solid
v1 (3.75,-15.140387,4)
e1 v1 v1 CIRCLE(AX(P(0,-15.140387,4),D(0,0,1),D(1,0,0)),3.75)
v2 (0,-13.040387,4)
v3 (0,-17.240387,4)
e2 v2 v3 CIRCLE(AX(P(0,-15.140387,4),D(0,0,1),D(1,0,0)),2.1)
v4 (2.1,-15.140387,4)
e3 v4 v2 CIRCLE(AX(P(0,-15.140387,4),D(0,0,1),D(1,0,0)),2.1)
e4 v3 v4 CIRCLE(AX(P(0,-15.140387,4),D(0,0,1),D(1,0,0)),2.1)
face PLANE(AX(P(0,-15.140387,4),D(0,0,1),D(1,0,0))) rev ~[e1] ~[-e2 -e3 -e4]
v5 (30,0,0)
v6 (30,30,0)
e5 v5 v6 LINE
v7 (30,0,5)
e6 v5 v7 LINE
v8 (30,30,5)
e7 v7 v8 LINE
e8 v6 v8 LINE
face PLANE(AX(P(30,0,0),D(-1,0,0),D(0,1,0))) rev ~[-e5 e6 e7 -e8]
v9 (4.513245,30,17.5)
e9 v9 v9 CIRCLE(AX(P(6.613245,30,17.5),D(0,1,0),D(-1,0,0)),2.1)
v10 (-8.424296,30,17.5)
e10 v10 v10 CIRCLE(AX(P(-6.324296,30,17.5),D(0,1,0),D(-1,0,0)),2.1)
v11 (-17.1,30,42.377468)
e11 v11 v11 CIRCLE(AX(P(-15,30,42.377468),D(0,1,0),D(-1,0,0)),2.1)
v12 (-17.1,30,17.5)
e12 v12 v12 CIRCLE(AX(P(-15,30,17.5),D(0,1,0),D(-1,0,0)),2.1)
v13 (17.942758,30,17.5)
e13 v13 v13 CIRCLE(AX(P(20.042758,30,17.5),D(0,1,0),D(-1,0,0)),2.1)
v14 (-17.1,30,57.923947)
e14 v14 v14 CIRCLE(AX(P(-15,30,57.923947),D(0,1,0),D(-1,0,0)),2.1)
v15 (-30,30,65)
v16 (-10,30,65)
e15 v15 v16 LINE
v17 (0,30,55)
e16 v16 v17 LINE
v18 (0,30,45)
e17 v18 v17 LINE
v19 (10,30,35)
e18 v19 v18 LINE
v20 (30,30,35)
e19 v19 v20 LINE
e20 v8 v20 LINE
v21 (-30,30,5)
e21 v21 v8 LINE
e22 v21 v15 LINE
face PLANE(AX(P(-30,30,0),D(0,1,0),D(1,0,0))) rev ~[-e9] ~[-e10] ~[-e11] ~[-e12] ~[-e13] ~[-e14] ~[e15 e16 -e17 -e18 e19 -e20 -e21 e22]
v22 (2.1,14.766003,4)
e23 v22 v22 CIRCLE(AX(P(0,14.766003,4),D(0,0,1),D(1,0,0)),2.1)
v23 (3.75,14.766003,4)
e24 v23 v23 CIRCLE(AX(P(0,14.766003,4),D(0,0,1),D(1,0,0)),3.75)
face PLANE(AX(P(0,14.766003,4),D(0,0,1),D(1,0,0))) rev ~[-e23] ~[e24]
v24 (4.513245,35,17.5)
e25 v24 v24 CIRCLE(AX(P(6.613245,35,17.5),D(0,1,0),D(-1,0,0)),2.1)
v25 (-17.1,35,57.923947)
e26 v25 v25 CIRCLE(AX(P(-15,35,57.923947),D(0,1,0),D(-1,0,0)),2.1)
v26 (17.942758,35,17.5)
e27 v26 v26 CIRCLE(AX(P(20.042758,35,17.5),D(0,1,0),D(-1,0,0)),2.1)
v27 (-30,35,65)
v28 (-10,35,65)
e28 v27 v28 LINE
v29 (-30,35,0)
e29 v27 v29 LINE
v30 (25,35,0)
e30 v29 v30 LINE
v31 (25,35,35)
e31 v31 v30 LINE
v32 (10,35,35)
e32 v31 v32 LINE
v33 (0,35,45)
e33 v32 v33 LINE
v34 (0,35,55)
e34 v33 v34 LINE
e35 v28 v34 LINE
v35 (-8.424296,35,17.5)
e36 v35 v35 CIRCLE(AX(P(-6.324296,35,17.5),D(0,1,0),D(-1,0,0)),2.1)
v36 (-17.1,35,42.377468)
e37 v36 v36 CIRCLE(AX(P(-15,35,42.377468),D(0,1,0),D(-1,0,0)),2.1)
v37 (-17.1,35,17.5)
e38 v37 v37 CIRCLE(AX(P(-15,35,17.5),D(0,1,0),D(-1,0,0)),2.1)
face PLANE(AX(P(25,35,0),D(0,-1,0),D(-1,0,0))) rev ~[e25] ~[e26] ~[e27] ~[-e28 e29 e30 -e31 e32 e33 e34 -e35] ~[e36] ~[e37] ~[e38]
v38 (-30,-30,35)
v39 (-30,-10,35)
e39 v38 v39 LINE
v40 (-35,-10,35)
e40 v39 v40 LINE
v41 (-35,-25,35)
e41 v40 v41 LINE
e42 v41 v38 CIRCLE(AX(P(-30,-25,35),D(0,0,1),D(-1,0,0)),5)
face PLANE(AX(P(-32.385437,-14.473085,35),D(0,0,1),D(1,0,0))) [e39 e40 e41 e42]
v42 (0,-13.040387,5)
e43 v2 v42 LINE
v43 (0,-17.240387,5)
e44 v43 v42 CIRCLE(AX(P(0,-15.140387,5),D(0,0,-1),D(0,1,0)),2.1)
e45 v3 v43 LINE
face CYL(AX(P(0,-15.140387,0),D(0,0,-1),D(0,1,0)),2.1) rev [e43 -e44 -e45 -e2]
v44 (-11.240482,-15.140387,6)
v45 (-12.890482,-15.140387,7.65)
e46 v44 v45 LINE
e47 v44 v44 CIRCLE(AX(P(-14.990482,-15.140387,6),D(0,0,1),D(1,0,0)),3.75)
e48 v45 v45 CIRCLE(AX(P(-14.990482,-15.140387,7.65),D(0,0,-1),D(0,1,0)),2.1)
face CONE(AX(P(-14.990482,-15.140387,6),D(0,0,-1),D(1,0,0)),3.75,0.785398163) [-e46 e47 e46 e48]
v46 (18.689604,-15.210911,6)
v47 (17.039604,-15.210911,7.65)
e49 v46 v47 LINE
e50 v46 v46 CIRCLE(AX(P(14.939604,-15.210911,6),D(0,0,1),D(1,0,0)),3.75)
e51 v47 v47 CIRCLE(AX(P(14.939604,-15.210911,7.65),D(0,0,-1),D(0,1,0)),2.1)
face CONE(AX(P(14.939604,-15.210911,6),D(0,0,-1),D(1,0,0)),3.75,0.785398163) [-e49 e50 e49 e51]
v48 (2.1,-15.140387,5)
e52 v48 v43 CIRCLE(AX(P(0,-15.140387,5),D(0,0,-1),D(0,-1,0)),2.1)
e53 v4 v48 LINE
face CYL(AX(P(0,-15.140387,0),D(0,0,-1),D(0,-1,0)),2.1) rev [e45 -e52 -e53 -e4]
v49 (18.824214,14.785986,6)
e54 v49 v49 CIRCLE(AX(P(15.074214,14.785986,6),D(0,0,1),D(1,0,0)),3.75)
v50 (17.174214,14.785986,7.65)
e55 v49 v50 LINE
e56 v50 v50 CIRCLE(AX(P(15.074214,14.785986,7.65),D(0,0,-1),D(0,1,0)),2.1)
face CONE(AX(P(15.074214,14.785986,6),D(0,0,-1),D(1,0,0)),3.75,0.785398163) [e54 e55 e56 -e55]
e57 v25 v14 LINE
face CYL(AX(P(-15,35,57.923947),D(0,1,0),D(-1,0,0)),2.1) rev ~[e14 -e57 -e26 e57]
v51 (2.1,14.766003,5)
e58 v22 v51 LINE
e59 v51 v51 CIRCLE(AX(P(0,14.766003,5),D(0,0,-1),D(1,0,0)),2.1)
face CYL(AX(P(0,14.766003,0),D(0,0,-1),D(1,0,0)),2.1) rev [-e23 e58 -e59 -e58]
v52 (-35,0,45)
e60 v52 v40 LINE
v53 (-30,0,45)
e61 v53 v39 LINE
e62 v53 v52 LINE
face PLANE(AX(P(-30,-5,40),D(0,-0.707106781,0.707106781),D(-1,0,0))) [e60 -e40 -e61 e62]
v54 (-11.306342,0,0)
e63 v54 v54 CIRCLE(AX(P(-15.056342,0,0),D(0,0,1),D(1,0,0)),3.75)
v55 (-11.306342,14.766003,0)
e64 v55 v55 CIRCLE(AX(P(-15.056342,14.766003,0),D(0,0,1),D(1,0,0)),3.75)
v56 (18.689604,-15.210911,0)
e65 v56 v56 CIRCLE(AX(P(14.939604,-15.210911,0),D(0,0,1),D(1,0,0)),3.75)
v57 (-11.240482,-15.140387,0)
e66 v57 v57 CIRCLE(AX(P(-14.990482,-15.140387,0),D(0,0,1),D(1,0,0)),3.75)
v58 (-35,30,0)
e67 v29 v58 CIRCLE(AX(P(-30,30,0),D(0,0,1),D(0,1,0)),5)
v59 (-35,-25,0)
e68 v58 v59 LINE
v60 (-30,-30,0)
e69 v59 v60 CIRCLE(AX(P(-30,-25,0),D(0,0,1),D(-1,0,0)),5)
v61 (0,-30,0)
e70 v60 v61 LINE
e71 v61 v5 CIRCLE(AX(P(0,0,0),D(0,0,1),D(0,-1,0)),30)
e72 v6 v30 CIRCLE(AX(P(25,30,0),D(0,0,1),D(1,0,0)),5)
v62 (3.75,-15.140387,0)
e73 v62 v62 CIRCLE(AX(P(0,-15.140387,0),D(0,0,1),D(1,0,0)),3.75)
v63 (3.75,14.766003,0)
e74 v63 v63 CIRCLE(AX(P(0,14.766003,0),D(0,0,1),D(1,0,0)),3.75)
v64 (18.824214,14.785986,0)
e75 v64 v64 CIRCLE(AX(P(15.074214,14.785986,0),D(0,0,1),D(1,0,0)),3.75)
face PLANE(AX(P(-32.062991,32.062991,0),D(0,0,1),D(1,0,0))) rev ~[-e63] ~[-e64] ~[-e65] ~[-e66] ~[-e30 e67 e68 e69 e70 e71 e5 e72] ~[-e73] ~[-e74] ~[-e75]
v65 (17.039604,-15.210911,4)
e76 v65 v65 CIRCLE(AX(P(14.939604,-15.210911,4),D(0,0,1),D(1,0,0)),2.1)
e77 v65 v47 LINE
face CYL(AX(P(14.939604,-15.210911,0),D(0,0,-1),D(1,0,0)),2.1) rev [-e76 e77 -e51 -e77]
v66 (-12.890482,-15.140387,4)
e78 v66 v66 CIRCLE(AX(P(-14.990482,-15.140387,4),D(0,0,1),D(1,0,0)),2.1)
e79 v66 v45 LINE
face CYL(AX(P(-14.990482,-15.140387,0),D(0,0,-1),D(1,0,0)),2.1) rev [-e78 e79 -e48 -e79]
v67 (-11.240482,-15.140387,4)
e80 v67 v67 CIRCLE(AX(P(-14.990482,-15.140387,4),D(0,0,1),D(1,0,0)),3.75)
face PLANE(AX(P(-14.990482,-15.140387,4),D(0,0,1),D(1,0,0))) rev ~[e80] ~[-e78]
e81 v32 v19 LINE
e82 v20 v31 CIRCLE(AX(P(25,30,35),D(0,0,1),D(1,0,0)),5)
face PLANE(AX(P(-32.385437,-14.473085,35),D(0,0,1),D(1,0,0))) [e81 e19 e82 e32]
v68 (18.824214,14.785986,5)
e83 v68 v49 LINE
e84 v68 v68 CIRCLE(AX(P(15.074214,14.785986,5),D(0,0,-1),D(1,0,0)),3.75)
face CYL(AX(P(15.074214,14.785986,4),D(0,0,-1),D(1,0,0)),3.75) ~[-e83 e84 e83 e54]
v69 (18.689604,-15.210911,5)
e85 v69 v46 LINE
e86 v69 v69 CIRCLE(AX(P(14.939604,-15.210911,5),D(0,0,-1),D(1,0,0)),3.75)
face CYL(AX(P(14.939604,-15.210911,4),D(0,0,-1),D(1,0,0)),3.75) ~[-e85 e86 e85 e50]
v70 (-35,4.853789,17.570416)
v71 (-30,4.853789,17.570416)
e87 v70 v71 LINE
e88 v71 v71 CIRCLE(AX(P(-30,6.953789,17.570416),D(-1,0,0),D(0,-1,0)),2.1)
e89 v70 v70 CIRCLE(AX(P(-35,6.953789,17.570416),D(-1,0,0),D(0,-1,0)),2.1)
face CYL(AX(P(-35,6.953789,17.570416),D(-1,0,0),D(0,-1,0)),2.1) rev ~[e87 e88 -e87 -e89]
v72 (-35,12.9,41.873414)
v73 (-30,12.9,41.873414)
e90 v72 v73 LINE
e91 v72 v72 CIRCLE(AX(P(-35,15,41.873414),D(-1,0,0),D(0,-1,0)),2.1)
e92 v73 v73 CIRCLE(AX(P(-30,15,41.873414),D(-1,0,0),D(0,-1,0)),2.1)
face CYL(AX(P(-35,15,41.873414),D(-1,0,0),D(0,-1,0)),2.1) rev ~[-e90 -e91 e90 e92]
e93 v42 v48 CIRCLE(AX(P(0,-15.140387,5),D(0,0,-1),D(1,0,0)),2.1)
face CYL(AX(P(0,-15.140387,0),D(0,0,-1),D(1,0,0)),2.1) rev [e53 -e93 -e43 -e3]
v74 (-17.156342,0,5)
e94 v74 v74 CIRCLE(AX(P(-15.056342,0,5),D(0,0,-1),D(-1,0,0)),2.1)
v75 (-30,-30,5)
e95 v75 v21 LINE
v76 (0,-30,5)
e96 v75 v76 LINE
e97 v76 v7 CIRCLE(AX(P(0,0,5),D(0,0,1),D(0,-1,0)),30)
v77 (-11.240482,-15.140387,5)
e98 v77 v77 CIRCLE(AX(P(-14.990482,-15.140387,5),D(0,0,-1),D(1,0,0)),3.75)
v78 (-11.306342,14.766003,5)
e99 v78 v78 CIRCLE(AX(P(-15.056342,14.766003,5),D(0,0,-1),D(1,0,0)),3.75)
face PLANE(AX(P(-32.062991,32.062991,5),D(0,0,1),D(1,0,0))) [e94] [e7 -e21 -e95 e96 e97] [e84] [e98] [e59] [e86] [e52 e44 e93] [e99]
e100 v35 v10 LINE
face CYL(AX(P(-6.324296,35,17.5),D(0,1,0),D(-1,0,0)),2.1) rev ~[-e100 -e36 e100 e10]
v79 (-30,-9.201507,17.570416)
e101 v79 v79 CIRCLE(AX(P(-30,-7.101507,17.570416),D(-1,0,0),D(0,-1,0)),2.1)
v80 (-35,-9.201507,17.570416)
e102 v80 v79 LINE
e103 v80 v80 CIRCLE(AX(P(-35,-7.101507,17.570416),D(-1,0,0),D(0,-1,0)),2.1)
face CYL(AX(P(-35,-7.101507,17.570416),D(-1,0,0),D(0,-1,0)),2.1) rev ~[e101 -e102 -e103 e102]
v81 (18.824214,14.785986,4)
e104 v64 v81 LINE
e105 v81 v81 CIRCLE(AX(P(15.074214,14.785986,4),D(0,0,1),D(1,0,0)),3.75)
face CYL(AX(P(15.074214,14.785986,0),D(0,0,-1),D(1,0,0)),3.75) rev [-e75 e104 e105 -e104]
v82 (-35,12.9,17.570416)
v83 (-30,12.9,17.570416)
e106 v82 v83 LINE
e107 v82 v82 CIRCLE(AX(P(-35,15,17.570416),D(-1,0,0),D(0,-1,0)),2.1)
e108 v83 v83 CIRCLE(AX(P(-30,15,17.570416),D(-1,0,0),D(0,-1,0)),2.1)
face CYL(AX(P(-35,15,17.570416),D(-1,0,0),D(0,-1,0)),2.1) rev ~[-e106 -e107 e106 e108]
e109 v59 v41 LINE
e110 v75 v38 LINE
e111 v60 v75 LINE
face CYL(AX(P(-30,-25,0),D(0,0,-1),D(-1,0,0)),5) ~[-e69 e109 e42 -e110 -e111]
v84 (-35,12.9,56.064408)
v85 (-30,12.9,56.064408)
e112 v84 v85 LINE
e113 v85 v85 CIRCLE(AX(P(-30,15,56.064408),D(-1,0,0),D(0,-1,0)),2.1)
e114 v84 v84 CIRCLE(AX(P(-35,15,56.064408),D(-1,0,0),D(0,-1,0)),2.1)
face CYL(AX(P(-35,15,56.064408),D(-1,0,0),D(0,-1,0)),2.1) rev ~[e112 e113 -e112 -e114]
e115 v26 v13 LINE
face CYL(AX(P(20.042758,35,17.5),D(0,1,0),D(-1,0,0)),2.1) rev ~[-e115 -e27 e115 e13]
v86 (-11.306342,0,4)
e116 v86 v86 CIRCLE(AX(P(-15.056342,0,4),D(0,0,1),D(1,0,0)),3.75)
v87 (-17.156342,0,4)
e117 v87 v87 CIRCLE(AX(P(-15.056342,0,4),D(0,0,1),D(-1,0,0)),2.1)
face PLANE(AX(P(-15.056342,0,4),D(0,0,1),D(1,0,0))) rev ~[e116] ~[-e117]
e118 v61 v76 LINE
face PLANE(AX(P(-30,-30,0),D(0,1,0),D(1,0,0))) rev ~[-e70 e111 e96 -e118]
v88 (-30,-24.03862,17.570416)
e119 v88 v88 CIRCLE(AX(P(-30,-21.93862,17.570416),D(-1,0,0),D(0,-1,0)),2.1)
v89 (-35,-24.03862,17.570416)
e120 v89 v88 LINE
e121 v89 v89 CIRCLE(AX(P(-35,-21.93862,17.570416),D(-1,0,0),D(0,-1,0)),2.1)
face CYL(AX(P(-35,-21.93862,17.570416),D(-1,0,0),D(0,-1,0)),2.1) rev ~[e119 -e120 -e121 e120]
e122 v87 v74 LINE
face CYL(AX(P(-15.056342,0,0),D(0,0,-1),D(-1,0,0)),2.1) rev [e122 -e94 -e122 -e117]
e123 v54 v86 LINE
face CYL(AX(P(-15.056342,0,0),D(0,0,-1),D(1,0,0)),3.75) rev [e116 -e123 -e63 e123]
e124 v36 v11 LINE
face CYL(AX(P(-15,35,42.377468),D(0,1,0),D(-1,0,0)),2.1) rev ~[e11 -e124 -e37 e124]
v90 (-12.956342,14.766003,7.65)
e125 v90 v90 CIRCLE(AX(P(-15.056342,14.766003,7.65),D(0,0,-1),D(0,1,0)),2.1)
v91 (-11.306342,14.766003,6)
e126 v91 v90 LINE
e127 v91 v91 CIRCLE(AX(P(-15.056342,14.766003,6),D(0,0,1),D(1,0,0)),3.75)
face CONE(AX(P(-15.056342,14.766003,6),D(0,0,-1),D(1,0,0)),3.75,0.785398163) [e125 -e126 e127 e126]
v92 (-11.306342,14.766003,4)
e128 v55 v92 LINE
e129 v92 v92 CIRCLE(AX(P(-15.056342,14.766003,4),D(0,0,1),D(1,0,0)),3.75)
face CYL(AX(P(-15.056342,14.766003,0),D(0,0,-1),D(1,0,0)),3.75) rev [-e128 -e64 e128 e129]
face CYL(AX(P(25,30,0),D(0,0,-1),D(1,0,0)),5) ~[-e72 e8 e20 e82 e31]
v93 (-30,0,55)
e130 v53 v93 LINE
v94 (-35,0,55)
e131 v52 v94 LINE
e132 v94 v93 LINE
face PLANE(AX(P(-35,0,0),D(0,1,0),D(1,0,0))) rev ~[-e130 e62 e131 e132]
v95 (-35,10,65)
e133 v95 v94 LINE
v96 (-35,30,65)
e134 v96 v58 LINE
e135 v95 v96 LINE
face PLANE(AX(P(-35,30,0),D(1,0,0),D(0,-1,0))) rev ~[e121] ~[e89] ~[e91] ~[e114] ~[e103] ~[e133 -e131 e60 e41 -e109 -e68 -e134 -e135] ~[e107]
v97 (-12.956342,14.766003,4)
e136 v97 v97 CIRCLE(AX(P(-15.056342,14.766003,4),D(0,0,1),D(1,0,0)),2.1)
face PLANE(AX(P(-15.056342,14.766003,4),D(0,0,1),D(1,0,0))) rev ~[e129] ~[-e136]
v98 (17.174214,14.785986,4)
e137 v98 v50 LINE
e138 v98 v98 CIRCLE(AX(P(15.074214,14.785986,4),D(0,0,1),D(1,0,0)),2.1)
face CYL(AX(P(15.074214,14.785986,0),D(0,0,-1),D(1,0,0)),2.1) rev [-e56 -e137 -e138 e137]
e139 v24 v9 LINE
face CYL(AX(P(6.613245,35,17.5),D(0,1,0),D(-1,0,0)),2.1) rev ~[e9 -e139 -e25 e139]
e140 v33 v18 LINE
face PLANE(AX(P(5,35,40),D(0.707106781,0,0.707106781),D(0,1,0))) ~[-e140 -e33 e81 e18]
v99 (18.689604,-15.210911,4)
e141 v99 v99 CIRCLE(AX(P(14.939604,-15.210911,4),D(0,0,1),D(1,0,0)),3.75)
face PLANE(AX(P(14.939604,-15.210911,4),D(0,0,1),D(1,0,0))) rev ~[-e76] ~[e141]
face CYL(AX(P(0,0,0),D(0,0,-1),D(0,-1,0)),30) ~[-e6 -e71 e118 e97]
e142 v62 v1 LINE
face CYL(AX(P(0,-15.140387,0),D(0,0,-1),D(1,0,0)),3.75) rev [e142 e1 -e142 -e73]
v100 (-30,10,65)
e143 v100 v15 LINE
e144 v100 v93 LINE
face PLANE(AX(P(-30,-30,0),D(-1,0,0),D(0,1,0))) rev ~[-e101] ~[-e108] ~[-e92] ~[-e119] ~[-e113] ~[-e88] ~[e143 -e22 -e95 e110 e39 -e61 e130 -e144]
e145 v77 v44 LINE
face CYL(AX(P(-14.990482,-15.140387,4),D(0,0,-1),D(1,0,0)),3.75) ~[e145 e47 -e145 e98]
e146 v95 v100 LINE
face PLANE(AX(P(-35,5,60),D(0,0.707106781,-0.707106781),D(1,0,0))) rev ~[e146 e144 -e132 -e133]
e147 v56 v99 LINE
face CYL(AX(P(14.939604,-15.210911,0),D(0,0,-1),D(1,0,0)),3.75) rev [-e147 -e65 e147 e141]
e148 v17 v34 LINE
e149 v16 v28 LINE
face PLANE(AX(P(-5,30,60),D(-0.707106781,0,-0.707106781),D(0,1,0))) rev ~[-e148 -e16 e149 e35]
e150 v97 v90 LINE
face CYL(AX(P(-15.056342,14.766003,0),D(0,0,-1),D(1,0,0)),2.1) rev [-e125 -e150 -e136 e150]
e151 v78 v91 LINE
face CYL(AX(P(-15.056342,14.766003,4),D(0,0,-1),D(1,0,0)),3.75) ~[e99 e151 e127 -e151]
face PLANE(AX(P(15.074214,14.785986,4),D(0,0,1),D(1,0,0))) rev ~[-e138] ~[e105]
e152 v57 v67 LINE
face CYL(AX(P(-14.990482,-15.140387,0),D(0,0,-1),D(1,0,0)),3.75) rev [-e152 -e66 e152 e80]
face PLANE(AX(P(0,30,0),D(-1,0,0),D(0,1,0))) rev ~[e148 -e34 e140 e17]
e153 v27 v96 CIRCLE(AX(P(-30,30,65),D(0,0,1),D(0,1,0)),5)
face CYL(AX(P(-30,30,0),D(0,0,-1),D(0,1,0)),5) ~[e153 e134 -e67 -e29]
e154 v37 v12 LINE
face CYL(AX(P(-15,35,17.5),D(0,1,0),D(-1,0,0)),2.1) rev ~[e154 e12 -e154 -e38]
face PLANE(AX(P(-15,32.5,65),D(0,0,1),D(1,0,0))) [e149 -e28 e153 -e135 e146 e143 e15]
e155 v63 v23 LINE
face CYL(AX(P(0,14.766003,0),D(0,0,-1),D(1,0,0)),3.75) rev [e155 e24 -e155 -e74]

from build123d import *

# Parameters (mm, degrees)
F0_W      = 30
F0_H      = 30
F0_W_2    = 5
F0_H_2    = 5
F1_DEPTH  = 5
F2_DEPTH  = 35
F3_DEPTH  = 65
F4_R      = 2.1
F6_DEPTH  = 25
F5_R      = 2.1
F7_DEPTH  = 25
F8_R      = 3.75
F8_R_2    = 2.1
F9_DEPTH  = 4
F10_DEPTH = 25
F11_START = 4
F11_DEPTH = 4
F13_SIZE  = 10


# Not quite as in the source:
# - a fillet or chamfer that OpenCascade refuses, or shapes differently, is made with other operations: its cross-section is extruded or revolved along the edge and cut away or added


with BuildPart() as f1:
    # F0 (on Top) → F1 (new body)
    with BuildSketch(Plane.XY):
        with BuildLine():
            Line((-35, 30), (-30, 30))
            Line((-30, 30), (-30, 35))
            ThreePointArc((-30, 35), (-33.5355339059, 33.5355339059), (-35, 30))
        make_face()
        with Locations((15, 15)):
            Rectangle(F0_W, F0_H)
        with BuildLine():
            Line((0, 35), (0, 30))
            Line((0, 30), (30, 30))
            ThreePointArc((30, 30), (28.5355339059, 33.5355339059), (25, 35))
            Line((25, 35), (0, 35))
        make_face()
        with Locations((-15, -15)):
            Rectangle(F0_W, F0_H)
        with Locations((-32.5, 15)):
            Rectangle(F0_W_2, F0_H)
        with BuildLine():
            Line((30, 0), (0, 0))
            Line((0, 0), (0, -30))
            ThreePointArc((0, -30), (21.2132034356, -21.2132034356), (30, 0))
        make_face()
        with Locations((-15, 32.5)):
            Rectangle(F0_W, F0_H_2)
        with BuildLine():
            Line((-30, -30), (-30, 0))
            Line((-30, 0), (-35, 0))
            Line((-35, 0), (-35, -25))
            ThreePointArc((-35, -25), (-33.5355339059, -28.5355339059), (-30, -30))
        make_face()
        with Locations((-15, 15)):
            Rectangle(F0_W, F0_H)
    extrude(amount=F1_DEPTH)

    # F0 (on Top) → F2 (join)
    with BuildSketch(Plane.XY):
        with BuildLine():
            Line((-30, -30), (-30, 0))
            Line((-30, 0), (-35, 0))
            Line((-35, 0), (-35, -25))
            ThreePointArc((-35, -25), (-33.5355339059, -28.5355339059), (-30, -30))
        make_face()
        with Locations((-32.5, 15)):
            Rectangle(F0_W_2, F0_H)
        with BuildLine():
            Line((-35, 30), (-30, 30))
            Line((-30, 30), (-30, 35))
            ThreePointArc((-30, 35), (-33.5355339059, 33.5355339059), (-35, 30))
        make_face()
        with BuildLine():
            Line((0, 35), (0, 30))
            Line((0, 30), (30, 30))
            ThreePointArc((30, 30), (28.5355339059, 33.5355339059), (25, 35))
            Line((25, 35), (0, 35))
        make_face()
        with Locations((-15, 32.5)):
            Rectangle(F0_W, F0_H_2)
    extrude(amount=F2_DEPTH)

    # F0 (on Top) → F3 (join)
    with BuildSketch(Plane.XY):
        with Locations((-15, 32.5)):
            Rectangle(F0_W, F0_H_2)
        with BuildLine():
            Line((-35, 30), (-30, 30))
            Line((-30, 30), (-30, 35))
            ThreePointArc((-30, 35), (-33.5355339059, 33.5355339059), (-35, 30))
        make_face()
        with Locations((-32.5, 15)):
            Rectangle(F0_W_2, F0_H)
    extrude(amount=F3_DEPTH)

    # F4 (on face) → F6 (cut)
    with BuildSketch(Plane(origin=(0, 35, 0), x_dir=(-1, 0, 0), z_dir=(0, 1, 0))):
        with Locations((15, 17.5)):
            Circle(F4_R)
        with Locations((6.3242963515, 17.5)):
            Circle(F4_R)
        with Locations((-6.6132452339, 17.5)):
            Circle(F4_R)
        with Locations((-20.042758435, 17.5)):
            Circle(F4_R)
        with Locations((15, 42.3774681985)):
            Circle(F4_R)
        with Locations((15, 57.9239465296)):
            Circle(F4_R)
    extrude(amount=-F6_DEPTH, mode=Mode.SUBTRACT)

    # F5 (on face) → F7 (cut)
    with BuildSketch(Plane(origin=(-35, 0, 0), x_dir=(0, -1, 0), z_dir=(-1, 0, 0))):
        with Locations((21.9386201352, 17.5704155117)):
            Circle(F5_R)
        with Locations((7.1015073918, 17.5704155117)):
            Circle(F5_R)
        with Locations((-15, 17.5704155117)):
            Circle(F5_R)
        with Locations((-6.9537893869, 17.5704155117)):
            Circle(F5_R)
        with Locations((-15, 41.8734140694)):
            Circle(F5_R)
        with Locations((-15, 56.0644082725)):
            Circle(F5_R)
    extrude(amount=-F7_DEPTH, mode=Mode.SUBTRACT)

    # F8 (on face) → F9 (cut)
    with BuildSketch(Plane.XY):
        with Locations((-15.0563415678, 14.7660031606)):
            Circle(F8_R)
        with Locations((-15.0563415678, 14.7660031606)):
            Circle(F8_R_2, mode=Mode.SUBTRACT)
        with Locations((0, 14.7660031606)):
            Circle(F8_R)
        with Locations((0, 14.7660031606)):
            Circle(F8_R_2, mode=Mode.SUBTRACT)
        with Locations((15.0742138934, 14.7859862541)):
            Circle(F8_R)
        with Locations((15.0742138934, 14.7859862541)):
            Circle(F8_R_2, mode=Mode.SUBTRACT)
        with Locations((14.9396037335, -15.2109106032)):
            Circle(F8_R)
        with Locations((14.9396037335, -15.2109106032)):
            Circle(F8_R_2, mode=Mode.SUBTRACT)
        with Locations((0, -15.1403872296)):
            Circle(F8_R)
        with Locations((0, -15.1403872296)):
            Circle(F8_R_2, mode=Mode.SUBTRACT)
        with Locations((-14.9904824793, -15.1403872296)):
            Circle(F8_R)
        with Locations((-14.9904824793, -15.1403872296)):
            Circle(F8_R_2, mode=Mode.SUBTRACT)
        with Locations((-15.0563415678, 0)):
            Circle(F8_R)
        with Locations((-15.0563415678, 0)):
            Circle(F8_R_2, mode=Mode.SUBTRACT)
    extrude(amount=F9_DEPTH, mode=Mode.SUBTRACT)

    # F8 (on face) → F10 (cut)
    with BuildSketch(Plane.XY):
        with Locations((-14.9904824793, -15.1403872296)):
            Circle(F8_R_2)
        with BuildLine():
            Line((0, -17.2403872296), (0, -13.0403872296))
            ThreePointArc((0, -13.0403872296), (-2.1, -15.1403872296), (0, -17.2403872296))
        make_face()
        with BuildLine():
            ThreePointArc((2.1, -15.1403872296), (1.4849242405, -13.6554629891), (0, -13.0403872296))
            Line((0, -13.0403872296), (0, -17.2403872296))
            ThreePointArc((0, -17.2403872296), (1.4849242405, -16.6253114701), (2.1, -15.1403872296))
        make_face()
        with Locations((14.9396037335, -15.2109106032)):
            Circle(F8_R_2)
        with Locations((15.0742138934, 14.7859862541)):
            Circle(F8_R_2)
        with Locations((0, 14.7660031606)):
            Circle(F8_R_2)
        with Locations((-15.0563415678, 14.7660031606)):
            Circle(F8_R_2)
        with BuildLine():
            Line((-17.1563415678, 0), (-12.9563415678, 0))
            ThreePointArc((-12.9563415678, 0), (-15.0563415678, 2.1), (-17.1563415678, 0))
        make_face()
        with BuildLine():
            ThreePointArc((-17.1563415678, 0), (-15.0563415678, -2.1), (-12.9563415678, 0))
            Line((-12.9563415678, 0), (-17.1563415678, 0))
        make_face()
    extrude(amount=F10_DEPTH, mode=Mode.SUBTRACT)

    # F8 (on face) → F11 (join)
    with BuildSketch(Plane.XY.offset(F11_START)):
        with Locations((-14.9904824793, -15.1403872296)):
            Circle(F8_R)
        with Locations((-14.9904824793, -15.1403872296)):
            Circle(F8_R_2, mode=Mode.SUBTRACT)
        with Locations((14.9396037335, -15.2109106032)):
            Circle(F8_R)
        with Locations((14.9396037335, -15.2109106032)):
            Circle(F8_R_2, mode=Mode.SUBTRACT)
        with Locations((-15.0563415678, 14.7660031606)):
            Circle(F8_R)
        with Locations((-15.0563415678, 14.7660031606)):
            Circle(F8_R_2, mode=Mode.SUBTRACT)
        with Locations((15.0742138934, 14.7859862541)):
            Circle(F8_R)
        with Locations((15.0742138934, 14.7859862541)):
            Circle(F8_R_2, mode=Mode.SUBTRACT)
    extrude(amount=F11_DEPTH)

    # F12: chamfer of 2 on 4 edges, made by hand

    # F12_s1 → F12_t2 (revolve, cut)
    with BuildSketch(Plane.XZ.offset(-14.7660031606)):
        Polygon((-11.3063415678, 6), (-13.3063415678, 8), (-11.3063415678, 8), align=None)
    revolve(axis=Axis((-15.0563415678, 14.7660031606, 8), (0, 0, 1)), mode=Mode.SUBTRACT)

    # F12_s3 → F12_t4 (revolve, cut)
    with BuildSketch(Plane.XZ.offset(-14.7859862541)):
        Polygon((18.8242138934, 6), (16.8242138934, 8), (18.8242138934, 8), align=None)
    revolve(axis=Axis((15.0742138934, 14.7859862541, 8), (0, 0, 1)), mode=Mode.SUBTRACT)

    # F12_s5 → F12_t6 (revolve, cut)
    with BuildSketch(Plane.XZ.offset(15.2109106032)):
        Polygon((18.6896037335, 6), (16.6896037335, 8), (18.6896037335, 8), align=None)
    revolve(axis=Axis((14.9396037335, -15.2109106032, 8), (0, 0, 1)), mode=Mode.SUBTRACT)

    # F12_s7 → F12_t8 (revolve, cut)
    with BuildSketch(Plane.XZ.offset(15.1403872296)):
        Polygon((-11.2404824793, 6), (-13.2404824793, 8), (-11.2404824793, 8), align=None)
    revolve(axis=Axis((-14.9904824793, -15.1403872296, 8), (0, 0, 1)), mode=Mode.SUBTRACT)

    # F13
    f13_edges = [f1.edges().sort_by_distance(p)[0] for p in [
        (-32.5, 0, 65),
        (0, 32.5, 65),
        (-32.5, 0, 35),
        (0, 32.5, 35),
    ]]
    chamfer(f13_edges, length=F13_SIZE)


solid = f1.part
